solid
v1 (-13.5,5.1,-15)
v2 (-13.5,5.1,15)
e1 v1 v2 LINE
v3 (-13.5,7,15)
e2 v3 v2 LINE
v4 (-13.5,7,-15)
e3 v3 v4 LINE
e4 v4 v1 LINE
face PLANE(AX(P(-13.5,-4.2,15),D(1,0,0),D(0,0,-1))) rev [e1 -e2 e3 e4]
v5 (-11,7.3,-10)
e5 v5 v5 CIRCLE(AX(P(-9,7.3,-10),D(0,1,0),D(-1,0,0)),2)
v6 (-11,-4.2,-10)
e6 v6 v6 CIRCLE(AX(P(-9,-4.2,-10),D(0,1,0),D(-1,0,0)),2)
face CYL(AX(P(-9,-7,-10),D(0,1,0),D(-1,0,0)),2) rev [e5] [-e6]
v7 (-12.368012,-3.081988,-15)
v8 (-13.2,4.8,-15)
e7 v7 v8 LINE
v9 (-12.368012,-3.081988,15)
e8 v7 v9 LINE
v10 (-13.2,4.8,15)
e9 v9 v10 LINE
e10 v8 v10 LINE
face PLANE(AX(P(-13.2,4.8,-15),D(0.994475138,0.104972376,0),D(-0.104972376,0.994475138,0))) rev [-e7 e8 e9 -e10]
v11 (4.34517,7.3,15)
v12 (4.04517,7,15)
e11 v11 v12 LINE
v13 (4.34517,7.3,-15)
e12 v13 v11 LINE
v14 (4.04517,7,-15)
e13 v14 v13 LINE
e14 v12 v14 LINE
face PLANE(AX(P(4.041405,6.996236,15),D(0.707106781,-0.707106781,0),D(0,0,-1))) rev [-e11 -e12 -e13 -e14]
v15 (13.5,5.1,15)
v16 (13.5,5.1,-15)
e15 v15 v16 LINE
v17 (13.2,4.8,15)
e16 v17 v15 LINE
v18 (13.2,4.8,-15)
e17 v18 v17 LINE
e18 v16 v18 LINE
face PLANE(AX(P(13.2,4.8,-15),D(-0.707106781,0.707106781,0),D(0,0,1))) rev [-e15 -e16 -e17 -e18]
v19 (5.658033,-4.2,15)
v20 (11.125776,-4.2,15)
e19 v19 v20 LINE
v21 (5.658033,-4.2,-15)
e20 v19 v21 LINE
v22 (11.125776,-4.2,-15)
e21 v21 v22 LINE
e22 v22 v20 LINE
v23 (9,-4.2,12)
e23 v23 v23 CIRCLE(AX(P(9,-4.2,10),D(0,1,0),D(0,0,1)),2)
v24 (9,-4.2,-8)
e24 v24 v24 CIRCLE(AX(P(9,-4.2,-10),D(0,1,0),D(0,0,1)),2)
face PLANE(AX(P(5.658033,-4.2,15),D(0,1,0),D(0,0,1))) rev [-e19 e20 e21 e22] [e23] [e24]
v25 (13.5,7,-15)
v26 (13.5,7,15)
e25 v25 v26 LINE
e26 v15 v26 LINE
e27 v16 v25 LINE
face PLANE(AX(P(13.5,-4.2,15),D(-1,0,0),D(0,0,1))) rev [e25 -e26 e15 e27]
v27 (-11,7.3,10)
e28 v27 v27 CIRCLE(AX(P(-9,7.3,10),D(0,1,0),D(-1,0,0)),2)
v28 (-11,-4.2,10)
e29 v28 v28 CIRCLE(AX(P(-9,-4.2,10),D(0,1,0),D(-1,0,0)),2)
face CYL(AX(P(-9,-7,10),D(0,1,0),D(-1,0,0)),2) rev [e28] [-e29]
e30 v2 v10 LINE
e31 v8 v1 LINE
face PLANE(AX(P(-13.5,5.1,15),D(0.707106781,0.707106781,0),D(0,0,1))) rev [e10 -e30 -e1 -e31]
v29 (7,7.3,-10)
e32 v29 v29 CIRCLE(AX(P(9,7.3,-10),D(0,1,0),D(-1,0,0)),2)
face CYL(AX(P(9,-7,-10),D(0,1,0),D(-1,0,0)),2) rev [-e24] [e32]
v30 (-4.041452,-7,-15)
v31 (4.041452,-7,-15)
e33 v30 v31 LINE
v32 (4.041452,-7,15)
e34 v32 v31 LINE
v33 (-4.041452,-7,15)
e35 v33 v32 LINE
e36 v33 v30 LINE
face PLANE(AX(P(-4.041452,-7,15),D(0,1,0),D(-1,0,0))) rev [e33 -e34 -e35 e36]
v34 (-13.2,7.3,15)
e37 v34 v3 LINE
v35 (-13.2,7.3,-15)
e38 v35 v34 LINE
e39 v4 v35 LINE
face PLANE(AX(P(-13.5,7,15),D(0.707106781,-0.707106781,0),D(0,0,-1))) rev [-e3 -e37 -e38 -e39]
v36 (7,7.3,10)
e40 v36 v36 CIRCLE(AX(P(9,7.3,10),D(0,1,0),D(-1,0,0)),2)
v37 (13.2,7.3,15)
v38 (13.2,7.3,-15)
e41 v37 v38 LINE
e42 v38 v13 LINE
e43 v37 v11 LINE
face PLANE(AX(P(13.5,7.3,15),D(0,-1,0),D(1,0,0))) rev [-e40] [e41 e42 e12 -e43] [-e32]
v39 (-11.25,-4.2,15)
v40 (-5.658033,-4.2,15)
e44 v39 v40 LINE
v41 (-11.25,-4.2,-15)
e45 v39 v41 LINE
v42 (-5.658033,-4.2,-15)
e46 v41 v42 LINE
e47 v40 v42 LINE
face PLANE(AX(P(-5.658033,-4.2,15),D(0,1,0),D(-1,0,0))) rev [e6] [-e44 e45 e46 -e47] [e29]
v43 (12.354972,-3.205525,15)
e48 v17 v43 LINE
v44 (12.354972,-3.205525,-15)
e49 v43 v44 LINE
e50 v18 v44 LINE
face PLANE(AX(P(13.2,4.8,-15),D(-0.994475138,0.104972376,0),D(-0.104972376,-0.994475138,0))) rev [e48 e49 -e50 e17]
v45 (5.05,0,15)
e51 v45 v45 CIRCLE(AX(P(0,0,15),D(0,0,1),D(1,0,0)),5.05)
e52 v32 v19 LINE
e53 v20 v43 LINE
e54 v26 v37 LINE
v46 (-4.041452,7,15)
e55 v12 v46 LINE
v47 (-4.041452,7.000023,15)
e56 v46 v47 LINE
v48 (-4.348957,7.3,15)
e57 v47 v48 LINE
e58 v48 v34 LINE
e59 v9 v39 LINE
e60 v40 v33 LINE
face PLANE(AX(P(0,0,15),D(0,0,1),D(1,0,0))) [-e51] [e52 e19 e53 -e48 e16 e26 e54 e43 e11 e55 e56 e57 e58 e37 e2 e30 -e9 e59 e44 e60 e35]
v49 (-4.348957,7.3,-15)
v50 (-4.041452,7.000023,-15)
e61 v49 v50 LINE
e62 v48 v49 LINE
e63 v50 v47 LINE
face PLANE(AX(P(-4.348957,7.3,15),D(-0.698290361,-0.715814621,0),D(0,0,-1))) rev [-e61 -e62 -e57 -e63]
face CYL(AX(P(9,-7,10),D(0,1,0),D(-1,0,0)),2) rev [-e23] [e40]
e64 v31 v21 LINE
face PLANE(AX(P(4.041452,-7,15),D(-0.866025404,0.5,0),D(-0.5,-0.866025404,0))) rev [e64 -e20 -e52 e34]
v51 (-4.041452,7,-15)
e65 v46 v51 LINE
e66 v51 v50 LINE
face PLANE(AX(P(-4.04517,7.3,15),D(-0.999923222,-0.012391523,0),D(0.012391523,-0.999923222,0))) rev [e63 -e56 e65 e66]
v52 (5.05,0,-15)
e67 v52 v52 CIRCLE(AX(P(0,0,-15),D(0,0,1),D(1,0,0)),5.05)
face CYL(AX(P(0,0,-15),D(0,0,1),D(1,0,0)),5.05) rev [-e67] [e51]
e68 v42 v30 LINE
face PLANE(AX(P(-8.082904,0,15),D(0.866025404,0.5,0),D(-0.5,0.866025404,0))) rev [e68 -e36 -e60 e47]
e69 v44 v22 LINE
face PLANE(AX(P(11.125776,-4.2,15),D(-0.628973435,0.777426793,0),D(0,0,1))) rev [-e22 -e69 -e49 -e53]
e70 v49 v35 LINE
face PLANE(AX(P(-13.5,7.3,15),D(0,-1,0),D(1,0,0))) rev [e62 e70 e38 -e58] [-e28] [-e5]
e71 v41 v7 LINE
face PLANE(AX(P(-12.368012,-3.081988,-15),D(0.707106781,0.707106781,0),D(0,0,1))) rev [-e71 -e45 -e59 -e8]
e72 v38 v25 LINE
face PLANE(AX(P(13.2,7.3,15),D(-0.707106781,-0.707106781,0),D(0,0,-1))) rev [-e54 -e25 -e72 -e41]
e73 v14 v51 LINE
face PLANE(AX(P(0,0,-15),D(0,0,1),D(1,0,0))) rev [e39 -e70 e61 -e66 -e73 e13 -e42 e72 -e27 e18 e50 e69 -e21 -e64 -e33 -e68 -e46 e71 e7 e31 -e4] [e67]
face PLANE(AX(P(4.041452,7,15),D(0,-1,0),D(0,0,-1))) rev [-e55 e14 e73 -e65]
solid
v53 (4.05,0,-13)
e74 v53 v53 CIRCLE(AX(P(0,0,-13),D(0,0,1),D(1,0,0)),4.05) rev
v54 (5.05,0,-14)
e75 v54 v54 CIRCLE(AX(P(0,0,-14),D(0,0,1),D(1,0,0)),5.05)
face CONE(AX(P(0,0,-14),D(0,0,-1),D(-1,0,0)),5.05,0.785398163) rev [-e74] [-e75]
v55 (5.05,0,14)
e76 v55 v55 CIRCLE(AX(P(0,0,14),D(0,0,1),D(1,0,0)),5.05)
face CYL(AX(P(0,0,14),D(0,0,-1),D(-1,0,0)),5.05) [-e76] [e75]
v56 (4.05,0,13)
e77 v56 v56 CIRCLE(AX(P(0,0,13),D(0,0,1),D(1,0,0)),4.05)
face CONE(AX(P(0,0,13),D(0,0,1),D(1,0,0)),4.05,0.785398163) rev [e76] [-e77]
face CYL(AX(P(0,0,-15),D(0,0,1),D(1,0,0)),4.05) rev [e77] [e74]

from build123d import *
from OCP.BRepFilletAPI import BRepFilletAPI_MakeChamfer

# Parameters (mm, degrees)
BOSS_EXTRUDE1_DEPTH     = 15
BOSS_EXTRUDE2_DEPTH     = 15
CHAMFER1_SIZE           = 0.3
CHAMFER1_SIZE_2         = 0.303787717
CUT_EXTRUDE1_DEPTH      = 22.460195712
CUT_EXTRUDE1_DEPTH_BACK = 22.460195712
CHAMFER2_SIZE           = 0.3
CHAMFER3_SIZE           = 1
CHAMFER3_SIZE2          = 1.124223602
CUT_EXTRUDE2_DEPTH      = 22.460195712
CUT_EXTRUDE2_DEPTH_BACK = 22.460195712
SKETCH3_R               = 5.05
SKETCH6_R               = 5.05
BOSS_EXTRUDE3_DEPTH     = 14
CUT_EXTRUDE3_DEPTH      = 22.460195712
CUT_EXTRUDE3_DEPTH_BACK = 22.460195712
SKETCH7_R               = 4.05
CHAMFER4_SIZE           = 1
SKETCH8_R               = 2
CUT_EXTRUDE4_DEPTH      = 25.733378257


# Some blends are built 0.0001 mm under size
with BuildPart() as part:
    # Sketch2 → Boss-Extrude1 (new, symmetric)
    with BuildSketch(Plane.XY):
        Polygon((4.041451884, -7), (8.082903769, 0), (4.041451884, 7), (-4.041451884, 7), (-8.082903769, 0), (-4.041451884, -7), align=None)
    extrude(amount=BOSS_EXTRUDE1_DEPTH, both=True)

    # Sketch4 → Boss-Extrude2 (add, symmetric)
    with BuildSketch(Plane.XY):
        Polygon((5.658032638, -4.2), (13.5, -4.2), (13.5, 7.3), (4.045169627, 7.3), (4.041451884, 7), (-4.041451884, 7), (-4.045169627, 7.3), (-13.5, 7.3), (-13.5, -4.2), (-5.658032638, -4.2), (-4.041451884, -7), (4.041451884, -7), align=None)
    extrude(amount=BOSS_EXTRUDE2_DEPTH, both=True)

    # Chamfer1
    # the kernel refuses this chamfer: 0.303787717, 0.3 mm, written as the material it adds along each edge
    # the kernel refuses this chamfer: 0.303787717, 0.3 mm, written as the material it takes off along each edge
    with BuildSketch(Plane(origin=(13.5, 7.3, -15.771504896), x_dir=(0.027495876610584384, -0.9996219169112968, 0), z_dir=(0, 0, 1))) as chamfer1_2_piece_1:
        Polygon((CHAMFER1_SIZE * 0.999621916911, -CHAMFER1_SIZE * 0.0274958766106), (-CHAMFER1_SIZE * 0.0274958766106, -CHAMFER1_SIZE * 0.999621916911), (0, 0), align=None)
    extrude(amount=31.543009793, mode=Mode.SUBTRACT)
    with BuildSketch(Plane(origin=(-13.5, 7.3, -15.771504896), x_dir=(-0.027495876610584464, -0.9996219169112968, 0), z_dir=(0, 0, 1))) as chamfer1_2_piece_2:
        Polygon((CHAMFER1_SIZE * 0.999621916911, CHAMFER1_SIZE * 0.0274958766106), (-CHAMFER1_SIZE * 0.0274958766106, CHAMFER1_SIZE * 0.999621916911), (0, 0), align=None)
    extrude(amount=31.543009793, mode=Mode.SUBTRACT)
    with BuildSketch(Plane(origin=(4.045169627, 7.3, -15.78150282), x_dir=(-0.039528988982007254, -0.9992184240845743, 0), z_dir=(0, 0, 1))) as chamfer1_2_piece_3_section:
        Polygon((CHAMFER1_SIZE_2 * 0.999631529085, CHAMFER1_SIZE_2 * 0.0271441162549), (-CHAMFER1_SIZE * 0.039528988982, CHAMFER1_SIZE * 0.999218424085), (0, 0), align=None)
    chamfer1_2_piece_3 = extrude(amount=31.56300564, mode=Mode.PRIVATE)
    chamfer1_2_piece_3 = split(chamfer1_2_piece_3, bisect_by=Plane(origin=(4.143930379, 7, 0), z_dir=(0, 1, 0)), keep=Keep.TOP, mode=Mode.PRIVATE)
    add(chamfer1_2_piece_3, mode=Mode.SUBTRACT)
    with BuildSketch(Plane(origin=(-4.045169627, 7.3, -15.78150282), x_dir=(0.04021769089274653, -0.9991909413817038, 0), z_dir=(0, 0, 1))) as chamfer1_2_piece_4:
        Polygon((CHAMFER1_SIZE * 0.999612584063, -CHAMFER1_SIZE * 0.027833105882), (-CHAMFER1_SIZE_2 * 0.0402176908322, -CHAMFER1_SIZE_2 * 0.999190939877), (0, 0), align=None)
    extrude(amount=31.56300564, mode=Mode.SUBTRACT)

    # Sketch5 → Cut-Extrude1 (cut, two sides: drawn at the far end of the back side and taken through both)
    with BuildSketch(Plane.XY.offset(-CUT_EXTRUDE1_DEPTH_BACK)):
        Polygon((12.25, -4.2), (13.5, -4.2), (13.5, 4.8), (13.2, 4.8), align=None)
        Polygon((-13.2, 4.8), (-12.25, -4.2), (-13.5, -4.2), (-13.5, 4.8), align=None)
    extrude(amount=CUT_EXTRUDE1_DEPTH + CUT_EXTRUDE1_DEPTH_BACK, mode=Mode.SUBTRACT)

    # Chamfer2
    chamfer2_edges = [part.edges().sort_by_distance(p)[0] for p in [
        (-13.5, 4.8, 0),
        (13.5, 4.8, 0),
    ]]
    chamfer(chamfer2_edges, length=CHAMFER2_SIZE - 0.0001)  # a hair under: the kernel refuses the full size

    # Chamfer3: one chamfer whose edges measure the first distance from different faces: ONE call of the kernel's chamfer builder (chamfer() names one face for all edges)
    chamfer3_edges_1 = [part.edges().sort_by_distance(p)[0] for p in [
        (-12.25, -4.2, 0),
    ]]
    chamfer3_side_1 = [part.faces().sort_by_distance(p)[0] for p in [
        (-8.954016319, -4.2, 0),
    ]]
    chamfer3_edges_2 = [part.edges().sort_by_distance(p)[0] for p in [
        (12.25, -4.2, 0),
    ]]
    chamfer3_side_2 = [part.faces().sort_by_distance(p)[0] for p in [
        (12.725, 0.3, 0),
    ]]
    chamfer3 = BRepFilletAPI_MakeChamfer(part.part.solid().wrapped)
    for e in chamfer3_edges_1:
        chamfer3.Add(CHAMFER3_SIZE, CHAMFER3_SIZE2, e.wrapped, chamfer3_side_1[0].wrapped)  # the first distance lies on this face
    for e in chamfer3_edges_2:
        chamfer3.Add(CHAMFER3_SIZE, CHAMFER3_SIZE2, e.wrapped, chamfer3_side_2[0].wrapped)  # the first distance lies on this face
    add(Compound.cast(chamfer3.Shape()), mode=Mode.REPLACE)

    # Sketch3 → Cut-Extrude2 (cut, two sides: drawn at the far end of the back side and taken through both)
    with BuildSketch(Plane.XY.offset(-CUT_EXTRUDE2_DEPTH_BACK)):
        Circle(SKETCH3_R)
    extrude(amount=CUT_EXTRUDE2_DEPTH + CUT_EXTRUDE2_DEPTH_BACK, mode=Mode.SUBTRACT)

    # Sketch8 → Cut-Extrude4 (cut, through all)
    with BuildSketch(Plane(origin=(0, 7.3, 0), x_dir=(1, 0, 0), z_dir=(0, 1, 0))):
        with Locations(Location((-9, 10, 0), (0, 0, 180))):
            Circle(SKETCH8_R)
        with Locations(Location((9, 10, 0), (0, 0, 180))):
            Circle(SKETCH8_R)
        with Locations(Location((9, -10, 0), (0, 0, 180))):
            Circle(SKETCH8_R)
        with Locations(Location((-9, -10, 0), (0, 0, 180))):
            Circle(SKETCH8_R)
    extrude(amount=-CUT_EXTRUDE4_DEPTH, mode=Mode.SUBTRACT)


with BuildPart() as body_2:
    # Sketch6 → Boss-Extrude3 (new, symmetric)
    with BuildSketch(Plane.XY):
        Circle(SKETCH6_R)
    extrude(amount=BOSS_EXTRUDE3_DEPTH, both=True)

    # Sketch7 → Cut-Extrude3 (cut, two sides: drawn at the far end of the back side and taken through both)
    with BuildSketch(Plane.XY.offset(-CUT_EXTRUDE3_DEPTH_BACK)):
        Circle(SKETCH7_R)
    extrude(amount=CUT_EXTRUDE3_DEPTH + CUT_EXTRUDE3_DEPTH_BACK, mode=Mode.SUBTRACT)

    # Chamfer4
    chamfer4_edges = [body_2.edges().sort_by_distance(p)[0] for p in [
        (-4.05, 0, 14),
        (-4.05, 0, -14),
    ]]
    chamfer(chamfer4_edges, length=CHAMFER4_SIZE - 0.0001)  # a hair under: the kernel refuses the full size


solid = Compound([part.part, body_2.part])
